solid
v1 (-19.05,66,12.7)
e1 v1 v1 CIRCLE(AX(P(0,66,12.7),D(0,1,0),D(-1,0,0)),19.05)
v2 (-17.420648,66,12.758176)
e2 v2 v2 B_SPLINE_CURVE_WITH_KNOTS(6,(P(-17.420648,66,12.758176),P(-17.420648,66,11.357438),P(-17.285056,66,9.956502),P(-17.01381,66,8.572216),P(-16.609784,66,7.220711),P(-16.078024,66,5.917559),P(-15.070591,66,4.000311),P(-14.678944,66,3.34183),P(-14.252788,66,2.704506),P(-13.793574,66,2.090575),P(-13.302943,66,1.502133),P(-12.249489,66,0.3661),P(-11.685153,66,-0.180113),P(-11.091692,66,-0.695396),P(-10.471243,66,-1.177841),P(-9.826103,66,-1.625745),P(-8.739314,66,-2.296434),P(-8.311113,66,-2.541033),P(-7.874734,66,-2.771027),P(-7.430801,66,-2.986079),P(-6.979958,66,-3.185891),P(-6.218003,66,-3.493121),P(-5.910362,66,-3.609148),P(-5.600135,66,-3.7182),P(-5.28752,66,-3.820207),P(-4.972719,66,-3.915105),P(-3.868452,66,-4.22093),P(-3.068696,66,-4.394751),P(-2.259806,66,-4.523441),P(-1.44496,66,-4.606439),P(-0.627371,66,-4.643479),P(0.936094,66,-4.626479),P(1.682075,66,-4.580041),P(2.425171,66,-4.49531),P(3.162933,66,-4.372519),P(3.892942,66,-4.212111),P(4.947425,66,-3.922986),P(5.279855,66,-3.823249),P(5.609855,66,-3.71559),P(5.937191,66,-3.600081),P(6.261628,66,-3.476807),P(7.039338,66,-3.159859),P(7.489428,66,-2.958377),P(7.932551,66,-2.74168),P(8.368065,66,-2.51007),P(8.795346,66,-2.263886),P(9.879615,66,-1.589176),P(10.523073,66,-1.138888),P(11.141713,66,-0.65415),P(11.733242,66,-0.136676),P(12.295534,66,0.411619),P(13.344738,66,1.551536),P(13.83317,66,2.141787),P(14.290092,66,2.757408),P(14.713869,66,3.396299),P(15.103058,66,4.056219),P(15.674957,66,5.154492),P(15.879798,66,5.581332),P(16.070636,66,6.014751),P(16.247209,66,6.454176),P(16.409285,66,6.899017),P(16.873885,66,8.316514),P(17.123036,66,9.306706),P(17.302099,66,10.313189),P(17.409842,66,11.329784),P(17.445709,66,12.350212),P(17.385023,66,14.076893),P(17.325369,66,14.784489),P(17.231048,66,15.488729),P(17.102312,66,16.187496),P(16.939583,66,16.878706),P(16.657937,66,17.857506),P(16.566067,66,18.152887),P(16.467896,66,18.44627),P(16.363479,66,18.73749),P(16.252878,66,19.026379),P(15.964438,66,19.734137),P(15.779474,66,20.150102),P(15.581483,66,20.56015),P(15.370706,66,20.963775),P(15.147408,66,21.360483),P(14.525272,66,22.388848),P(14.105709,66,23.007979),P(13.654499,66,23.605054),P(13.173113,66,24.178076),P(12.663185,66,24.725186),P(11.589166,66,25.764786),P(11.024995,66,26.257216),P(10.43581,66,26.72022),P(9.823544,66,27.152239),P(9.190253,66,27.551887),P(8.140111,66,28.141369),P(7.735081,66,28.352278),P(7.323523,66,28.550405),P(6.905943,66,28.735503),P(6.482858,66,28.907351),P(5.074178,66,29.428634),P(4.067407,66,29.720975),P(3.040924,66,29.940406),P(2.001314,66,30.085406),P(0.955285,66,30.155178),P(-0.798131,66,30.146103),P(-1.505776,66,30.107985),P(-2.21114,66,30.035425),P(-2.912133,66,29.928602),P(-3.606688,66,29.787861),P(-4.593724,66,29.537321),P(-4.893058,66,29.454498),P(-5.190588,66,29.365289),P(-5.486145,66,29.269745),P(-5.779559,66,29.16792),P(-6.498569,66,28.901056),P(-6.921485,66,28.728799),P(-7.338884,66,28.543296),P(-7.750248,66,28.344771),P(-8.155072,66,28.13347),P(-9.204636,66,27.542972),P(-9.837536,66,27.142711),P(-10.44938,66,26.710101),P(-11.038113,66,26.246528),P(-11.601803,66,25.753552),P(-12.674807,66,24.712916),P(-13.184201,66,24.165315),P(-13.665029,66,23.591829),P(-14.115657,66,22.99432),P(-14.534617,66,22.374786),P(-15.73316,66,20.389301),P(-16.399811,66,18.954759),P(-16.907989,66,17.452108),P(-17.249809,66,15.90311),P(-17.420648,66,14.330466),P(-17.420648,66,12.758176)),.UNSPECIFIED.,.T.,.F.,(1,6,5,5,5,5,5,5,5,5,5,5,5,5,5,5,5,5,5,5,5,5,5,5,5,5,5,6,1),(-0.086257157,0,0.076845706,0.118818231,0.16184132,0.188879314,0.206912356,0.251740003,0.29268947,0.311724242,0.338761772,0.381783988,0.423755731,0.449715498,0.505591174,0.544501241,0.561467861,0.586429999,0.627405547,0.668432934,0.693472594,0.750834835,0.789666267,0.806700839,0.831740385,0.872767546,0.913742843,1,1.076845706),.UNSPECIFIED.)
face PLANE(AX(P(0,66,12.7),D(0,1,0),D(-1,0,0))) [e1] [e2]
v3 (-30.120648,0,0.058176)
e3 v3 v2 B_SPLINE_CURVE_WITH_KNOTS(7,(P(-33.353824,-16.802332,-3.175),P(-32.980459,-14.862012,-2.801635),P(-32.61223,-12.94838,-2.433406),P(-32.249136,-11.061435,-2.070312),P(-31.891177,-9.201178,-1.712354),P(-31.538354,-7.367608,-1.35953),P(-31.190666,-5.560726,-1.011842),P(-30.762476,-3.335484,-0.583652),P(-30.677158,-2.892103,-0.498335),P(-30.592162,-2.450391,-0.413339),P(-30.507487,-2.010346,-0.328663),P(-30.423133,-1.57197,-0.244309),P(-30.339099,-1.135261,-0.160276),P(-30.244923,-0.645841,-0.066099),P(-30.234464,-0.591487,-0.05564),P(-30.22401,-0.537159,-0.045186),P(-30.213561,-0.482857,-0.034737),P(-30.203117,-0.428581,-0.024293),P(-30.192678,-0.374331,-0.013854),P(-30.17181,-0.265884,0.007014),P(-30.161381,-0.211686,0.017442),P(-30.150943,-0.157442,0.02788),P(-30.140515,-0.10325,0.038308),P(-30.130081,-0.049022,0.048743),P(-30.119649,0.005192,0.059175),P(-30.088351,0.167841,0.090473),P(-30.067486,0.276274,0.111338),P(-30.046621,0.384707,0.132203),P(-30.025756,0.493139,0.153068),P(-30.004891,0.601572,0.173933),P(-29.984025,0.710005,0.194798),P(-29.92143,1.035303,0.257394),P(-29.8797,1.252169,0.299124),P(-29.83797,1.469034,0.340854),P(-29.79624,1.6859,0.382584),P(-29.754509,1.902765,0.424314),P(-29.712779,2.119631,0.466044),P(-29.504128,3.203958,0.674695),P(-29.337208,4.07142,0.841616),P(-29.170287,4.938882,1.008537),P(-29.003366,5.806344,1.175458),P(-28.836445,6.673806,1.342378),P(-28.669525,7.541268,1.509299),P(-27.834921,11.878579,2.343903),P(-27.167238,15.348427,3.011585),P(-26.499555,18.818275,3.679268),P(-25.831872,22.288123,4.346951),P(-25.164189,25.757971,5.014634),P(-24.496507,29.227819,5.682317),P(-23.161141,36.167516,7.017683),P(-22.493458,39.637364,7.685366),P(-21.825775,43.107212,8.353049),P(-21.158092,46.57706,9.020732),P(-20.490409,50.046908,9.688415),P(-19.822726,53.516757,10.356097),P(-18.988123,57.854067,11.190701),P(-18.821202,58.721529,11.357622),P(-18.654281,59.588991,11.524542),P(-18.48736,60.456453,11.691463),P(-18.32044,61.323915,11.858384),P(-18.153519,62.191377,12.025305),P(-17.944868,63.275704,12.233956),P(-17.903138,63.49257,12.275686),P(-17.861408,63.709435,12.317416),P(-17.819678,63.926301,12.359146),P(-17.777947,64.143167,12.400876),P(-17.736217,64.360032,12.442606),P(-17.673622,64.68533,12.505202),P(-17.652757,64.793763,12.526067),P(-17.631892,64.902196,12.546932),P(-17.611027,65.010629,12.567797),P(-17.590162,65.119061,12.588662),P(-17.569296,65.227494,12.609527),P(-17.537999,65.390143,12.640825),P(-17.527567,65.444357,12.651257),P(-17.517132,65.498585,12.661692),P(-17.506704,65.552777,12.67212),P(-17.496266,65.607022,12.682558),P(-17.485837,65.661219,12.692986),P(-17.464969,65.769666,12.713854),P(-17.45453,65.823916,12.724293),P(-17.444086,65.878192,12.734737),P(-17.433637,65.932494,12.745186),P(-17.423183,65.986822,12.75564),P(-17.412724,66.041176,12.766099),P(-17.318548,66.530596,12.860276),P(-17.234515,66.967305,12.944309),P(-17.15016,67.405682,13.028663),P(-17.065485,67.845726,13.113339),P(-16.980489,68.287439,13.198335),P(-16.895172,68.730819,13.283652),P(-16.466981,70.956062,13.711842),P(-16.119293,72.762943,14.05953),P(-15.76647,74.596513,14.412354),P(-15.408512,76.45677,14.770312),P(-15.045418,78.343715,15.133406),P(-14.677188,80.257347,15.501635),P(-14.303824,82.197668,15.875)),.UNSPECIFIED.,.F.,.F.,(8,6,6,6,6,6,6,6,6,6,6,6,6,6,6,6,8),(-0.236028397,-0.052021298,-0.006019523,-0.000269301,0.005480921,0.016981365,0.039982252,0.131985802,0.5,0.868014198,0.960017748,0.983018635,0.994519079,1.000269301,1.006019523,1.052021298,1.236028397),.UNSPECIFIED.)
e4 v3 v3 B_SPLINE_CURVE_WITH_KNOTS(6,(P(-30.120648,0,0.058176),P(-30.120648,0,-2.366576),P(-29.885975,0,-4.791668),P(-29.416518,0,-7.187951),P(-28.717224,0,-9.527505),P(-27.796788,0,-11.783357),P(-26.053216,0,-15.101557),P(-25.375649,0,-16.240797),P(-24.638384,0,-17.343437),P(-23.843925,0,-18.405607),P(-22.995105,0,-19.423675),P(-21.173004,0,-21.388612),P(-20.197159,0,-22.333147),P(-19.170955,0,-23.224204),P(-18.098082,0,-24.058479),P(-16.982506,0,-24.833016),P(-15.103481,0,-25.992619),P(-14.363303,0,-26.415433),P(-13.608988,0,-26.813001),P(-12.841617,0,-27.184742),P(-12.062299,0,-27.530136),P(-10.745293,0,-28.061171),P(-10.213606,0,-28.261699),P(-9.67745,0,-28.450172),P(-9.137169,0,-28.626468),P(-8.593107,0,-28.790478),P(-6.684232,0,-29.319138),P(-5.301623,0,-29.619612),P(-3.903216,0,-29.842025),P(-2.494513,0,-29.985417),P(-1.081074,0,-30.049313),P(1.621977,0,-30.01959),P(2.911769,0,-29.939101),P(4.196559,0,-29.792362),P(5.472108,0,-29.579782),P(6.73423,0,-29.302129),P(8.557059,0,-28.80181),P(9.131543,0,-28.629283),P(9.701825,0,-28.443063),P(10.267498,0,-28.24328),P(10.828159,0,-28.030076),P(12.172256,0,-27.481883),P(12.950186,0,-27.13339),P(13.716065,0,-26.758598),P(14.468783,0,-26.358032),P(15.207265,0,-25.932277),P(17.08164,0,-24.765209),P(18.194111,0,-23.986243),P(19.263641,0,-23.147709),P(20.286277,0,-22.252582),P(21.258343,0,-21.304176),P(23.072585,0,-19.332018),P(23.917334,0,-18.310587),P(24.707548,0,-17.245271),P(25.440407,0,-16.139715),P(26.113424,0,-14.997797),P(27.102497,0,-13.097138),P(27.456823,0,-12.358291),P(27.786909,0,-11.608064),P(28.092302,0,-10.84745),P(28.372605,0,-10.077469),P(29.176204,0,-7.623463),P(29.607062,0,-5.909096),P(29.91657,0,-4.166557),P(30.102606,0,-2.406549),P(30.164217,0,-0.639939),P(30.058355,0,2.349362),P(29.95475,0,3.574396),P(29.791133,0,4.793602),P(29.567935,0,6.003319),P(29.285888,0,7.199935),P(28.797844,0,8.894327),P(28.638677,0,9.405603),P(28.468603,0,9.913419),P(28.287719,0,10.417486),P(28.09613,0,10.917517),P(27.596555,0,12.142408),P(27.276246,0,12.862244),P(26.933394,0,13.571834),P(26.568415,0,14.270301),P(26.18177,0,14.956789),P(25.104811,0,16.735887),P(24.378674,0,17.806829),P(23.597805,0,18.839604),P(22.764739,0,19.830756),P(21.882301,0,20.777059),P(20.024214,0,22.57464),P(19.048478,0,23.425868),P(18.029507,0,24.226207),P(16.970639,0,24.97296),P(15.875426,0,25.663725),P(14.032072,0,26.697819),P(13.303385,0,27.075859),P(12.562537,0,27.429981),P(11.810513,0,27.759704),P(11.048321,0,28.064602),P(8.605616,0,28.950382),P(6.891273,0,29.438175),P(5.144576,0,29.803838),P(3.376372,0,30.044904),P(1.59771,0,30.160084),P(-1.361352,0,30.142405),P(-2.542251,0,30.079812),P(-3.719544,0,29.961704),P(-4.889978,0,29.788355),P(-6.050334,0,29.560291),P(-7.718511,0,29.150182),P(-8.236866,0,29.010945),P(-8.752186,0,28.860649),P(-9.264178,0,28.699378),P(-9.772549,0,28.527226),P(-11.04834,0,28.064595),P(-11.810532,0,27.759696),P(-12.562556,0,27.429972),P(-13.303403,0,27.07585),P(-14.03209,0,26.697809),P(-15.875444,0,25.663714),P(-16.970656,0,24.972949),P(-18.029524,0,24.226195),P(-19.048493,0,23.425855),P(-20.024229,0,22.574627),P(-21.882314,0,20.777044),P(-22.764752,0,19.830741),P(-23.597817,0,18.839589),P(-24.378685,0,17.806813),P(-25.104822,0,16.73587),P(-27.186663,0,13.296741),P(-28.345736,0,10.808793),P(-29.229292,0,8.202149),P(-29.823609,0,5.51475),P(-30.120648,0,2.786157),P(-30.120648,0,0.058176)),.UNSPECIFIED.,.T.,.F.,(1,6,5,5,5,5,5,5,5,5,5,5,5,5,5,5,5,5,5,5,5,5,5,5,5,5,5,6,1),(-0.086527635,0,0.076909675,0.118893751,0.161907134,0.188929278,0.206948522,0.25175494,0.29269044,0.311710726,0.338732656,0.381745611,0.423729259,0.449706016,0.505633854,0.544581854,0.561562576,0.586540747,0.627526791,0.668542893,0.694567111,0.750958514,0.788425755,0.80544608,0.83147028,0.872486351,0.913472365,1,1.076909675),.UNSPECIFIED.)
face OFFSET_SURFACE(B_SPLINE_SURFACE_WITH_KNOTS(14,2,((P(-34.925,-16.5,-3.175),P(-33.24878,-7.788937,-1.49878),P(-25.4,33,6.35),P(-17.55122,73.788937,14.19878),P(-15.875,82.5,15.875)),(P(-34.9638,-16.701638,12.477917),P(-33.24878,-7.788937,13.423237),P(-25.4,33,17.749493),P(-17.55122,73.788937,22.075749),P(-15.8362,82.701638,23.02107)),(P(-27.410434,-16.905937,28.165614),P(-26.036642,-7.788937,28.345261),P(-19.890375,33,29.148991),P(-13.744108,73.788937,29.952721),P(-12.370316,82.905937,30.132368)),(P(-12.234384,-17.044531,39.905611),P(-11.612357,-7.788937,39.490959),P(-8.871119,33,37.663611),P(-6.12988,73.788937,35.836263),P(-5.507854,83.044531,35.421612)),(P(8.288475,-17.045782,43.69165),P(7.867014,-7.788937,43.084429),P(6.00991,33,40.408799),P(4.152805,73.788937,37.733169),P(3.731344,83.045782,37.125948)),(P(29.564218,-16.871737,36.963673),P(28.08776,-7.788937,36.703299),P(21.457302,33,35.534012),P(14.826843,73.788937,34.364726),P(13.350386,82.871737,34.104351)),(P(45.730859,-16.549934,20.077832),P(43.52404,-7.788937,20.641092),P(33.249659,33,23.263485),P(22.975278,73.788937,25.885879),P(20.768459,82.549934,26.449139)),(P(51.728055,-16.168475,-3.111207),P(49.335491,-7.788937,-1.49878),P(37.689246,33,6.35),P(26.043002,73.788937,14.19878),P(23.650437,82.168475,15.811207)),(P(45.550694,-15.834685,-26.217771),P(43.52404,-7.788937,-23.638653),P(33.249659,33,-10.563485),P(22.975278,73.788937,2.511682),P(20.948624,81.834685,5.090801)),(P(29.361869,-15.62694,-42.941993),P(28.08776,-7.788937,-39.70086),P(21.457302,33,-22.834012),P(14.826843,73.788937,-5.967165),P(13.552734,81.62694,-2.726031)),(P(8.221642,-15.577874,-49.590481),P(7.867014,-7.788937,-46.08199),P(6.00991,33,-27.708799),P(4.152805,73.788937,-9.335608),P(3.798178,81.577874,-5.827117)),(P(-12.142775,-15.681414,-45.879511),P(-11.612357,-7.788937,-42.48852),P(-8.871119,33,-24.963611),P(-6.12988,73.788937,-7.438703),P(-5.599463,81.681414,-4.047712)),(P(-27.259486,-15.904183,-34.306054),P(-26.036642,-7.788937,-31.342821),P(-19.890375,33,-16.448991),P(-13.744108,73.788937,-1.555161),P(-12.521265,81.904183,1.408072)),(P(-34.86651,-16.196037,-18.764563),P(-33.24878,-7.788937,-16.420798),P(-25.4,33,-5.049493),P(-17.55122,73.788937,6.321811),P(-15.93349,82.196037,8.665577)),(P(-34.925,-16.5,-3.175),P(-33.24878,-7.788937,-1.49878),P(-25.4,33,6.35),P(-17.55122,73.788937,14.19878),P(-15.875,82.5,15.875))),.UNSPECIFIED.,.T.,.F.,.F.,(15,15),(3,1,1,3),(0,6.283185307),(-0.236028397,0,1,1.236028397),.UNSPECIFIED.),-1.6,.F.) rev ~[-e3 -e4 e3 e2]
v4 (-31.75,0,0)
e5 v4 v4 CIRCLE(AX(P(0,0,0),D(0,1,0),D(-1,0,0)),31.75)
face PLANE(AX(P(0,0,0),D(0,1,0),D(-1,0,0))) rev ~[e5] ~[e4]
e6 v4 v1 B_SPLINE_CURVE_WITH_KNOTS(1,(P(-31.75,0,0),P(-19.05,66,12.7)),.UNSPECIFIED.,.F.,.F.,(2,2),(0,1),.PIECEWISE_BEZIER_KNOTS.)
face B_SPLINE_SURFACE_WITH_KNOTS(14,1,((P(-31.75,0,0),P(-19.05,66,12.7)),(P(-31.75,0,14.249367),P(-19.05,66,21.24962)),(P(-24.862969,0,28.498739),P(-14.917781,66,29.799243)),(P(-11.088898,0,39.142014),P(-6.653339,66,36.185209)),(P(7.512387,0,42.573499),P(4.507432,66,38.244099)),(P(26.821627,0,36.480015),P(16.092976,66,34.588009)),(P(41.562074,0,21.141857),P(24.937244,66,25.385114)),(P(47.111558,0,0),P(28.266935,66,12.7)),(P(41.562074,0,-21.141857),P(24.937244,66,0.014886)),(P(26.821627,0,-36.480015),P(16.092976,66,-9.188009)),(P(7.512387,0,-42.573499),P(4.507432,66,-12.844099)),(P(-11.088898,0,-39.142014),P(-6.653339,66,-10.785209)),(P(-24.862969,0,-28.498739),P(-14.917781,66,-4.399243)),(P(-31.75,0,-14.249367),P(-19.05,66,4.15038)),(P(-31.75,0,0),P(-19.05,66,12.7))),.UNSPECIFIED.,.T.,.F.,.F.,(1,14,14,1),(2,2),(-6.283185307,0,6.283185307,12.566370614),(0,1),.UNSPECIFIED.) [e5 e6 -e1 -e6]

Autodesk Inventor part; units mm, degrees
ref_plane "YZ Plane" through (0, 0, 0) normal (1, 0, 0) x (0, 1, 0)
ref_plane "XY Plane" through (0, 0, 0) normal (0, 0, 1) x (1, 0, 0)
sketch "Szkic6" plane through (0, 0, 0) normal (0, 1, 0) x (-1, 0, 0)
  circle A0 centre (0, 0) radius 31.75
  dimension "d33" = 63.5
ref_plane "Płaszczyzna konstrukcyjna1" through (0, 66, 0) normal (0, 1, 0) x (-1, 0, 0)
sketch "Szkic7" plane through (0, 66, 0) normal (0, 1, 0) x (-1, 0, 0)
  circle A0 centre (0, 12.7) radius 19.05
  line L0 (0, -20.3) -> (0, 20.3) construction
  circle A1 centre (0, 0) radius 31.75 construction
  dimension "d35" = 38.1
loft "Wyciągnięcie złożone1" add profiles "Szkic6", "Szkic7"
shell "Skorupa1" thickness 1.6 removed faces 2 at (0.7654, 66, 22.043) at (14.3997, 0, 5.5289)
equation "\"d33\" = OD1"
equation "\"d35\" = OD2"
equation "\"d52\" = THK"
equation "\"SzerokośćGięciaPodcięcia\" = Grubość"
equation "\"RozmiarPodcięciaNarożnika\" = 4 * Grubość"
equation "\"PromieńPrzejścia\" = PromieńGięcia"
equation "\"Rozmiar_promienia_Jacobiego\" = PromieńGięcia"
equation "\"Wielk_odstępu\" = Grubość"
equation "\"d2\" = PromieńGięcia"
equation "\"d23\" = PromieńGięcia"
equation "\"OD1\" = 63.5"
equation "\"OD2\" = 38.1"
equation "\"L\" = 66"
equation "\"THK\" = 1.6"
equation "\"d34\" = L"
equation "\"Grubość\" = 1.5"
equation "\"PromieńGięcia\" = 3"
properties part number "Redukcja asymetryczna Ø63,5x38,1x1,6 L=66" material "304"
